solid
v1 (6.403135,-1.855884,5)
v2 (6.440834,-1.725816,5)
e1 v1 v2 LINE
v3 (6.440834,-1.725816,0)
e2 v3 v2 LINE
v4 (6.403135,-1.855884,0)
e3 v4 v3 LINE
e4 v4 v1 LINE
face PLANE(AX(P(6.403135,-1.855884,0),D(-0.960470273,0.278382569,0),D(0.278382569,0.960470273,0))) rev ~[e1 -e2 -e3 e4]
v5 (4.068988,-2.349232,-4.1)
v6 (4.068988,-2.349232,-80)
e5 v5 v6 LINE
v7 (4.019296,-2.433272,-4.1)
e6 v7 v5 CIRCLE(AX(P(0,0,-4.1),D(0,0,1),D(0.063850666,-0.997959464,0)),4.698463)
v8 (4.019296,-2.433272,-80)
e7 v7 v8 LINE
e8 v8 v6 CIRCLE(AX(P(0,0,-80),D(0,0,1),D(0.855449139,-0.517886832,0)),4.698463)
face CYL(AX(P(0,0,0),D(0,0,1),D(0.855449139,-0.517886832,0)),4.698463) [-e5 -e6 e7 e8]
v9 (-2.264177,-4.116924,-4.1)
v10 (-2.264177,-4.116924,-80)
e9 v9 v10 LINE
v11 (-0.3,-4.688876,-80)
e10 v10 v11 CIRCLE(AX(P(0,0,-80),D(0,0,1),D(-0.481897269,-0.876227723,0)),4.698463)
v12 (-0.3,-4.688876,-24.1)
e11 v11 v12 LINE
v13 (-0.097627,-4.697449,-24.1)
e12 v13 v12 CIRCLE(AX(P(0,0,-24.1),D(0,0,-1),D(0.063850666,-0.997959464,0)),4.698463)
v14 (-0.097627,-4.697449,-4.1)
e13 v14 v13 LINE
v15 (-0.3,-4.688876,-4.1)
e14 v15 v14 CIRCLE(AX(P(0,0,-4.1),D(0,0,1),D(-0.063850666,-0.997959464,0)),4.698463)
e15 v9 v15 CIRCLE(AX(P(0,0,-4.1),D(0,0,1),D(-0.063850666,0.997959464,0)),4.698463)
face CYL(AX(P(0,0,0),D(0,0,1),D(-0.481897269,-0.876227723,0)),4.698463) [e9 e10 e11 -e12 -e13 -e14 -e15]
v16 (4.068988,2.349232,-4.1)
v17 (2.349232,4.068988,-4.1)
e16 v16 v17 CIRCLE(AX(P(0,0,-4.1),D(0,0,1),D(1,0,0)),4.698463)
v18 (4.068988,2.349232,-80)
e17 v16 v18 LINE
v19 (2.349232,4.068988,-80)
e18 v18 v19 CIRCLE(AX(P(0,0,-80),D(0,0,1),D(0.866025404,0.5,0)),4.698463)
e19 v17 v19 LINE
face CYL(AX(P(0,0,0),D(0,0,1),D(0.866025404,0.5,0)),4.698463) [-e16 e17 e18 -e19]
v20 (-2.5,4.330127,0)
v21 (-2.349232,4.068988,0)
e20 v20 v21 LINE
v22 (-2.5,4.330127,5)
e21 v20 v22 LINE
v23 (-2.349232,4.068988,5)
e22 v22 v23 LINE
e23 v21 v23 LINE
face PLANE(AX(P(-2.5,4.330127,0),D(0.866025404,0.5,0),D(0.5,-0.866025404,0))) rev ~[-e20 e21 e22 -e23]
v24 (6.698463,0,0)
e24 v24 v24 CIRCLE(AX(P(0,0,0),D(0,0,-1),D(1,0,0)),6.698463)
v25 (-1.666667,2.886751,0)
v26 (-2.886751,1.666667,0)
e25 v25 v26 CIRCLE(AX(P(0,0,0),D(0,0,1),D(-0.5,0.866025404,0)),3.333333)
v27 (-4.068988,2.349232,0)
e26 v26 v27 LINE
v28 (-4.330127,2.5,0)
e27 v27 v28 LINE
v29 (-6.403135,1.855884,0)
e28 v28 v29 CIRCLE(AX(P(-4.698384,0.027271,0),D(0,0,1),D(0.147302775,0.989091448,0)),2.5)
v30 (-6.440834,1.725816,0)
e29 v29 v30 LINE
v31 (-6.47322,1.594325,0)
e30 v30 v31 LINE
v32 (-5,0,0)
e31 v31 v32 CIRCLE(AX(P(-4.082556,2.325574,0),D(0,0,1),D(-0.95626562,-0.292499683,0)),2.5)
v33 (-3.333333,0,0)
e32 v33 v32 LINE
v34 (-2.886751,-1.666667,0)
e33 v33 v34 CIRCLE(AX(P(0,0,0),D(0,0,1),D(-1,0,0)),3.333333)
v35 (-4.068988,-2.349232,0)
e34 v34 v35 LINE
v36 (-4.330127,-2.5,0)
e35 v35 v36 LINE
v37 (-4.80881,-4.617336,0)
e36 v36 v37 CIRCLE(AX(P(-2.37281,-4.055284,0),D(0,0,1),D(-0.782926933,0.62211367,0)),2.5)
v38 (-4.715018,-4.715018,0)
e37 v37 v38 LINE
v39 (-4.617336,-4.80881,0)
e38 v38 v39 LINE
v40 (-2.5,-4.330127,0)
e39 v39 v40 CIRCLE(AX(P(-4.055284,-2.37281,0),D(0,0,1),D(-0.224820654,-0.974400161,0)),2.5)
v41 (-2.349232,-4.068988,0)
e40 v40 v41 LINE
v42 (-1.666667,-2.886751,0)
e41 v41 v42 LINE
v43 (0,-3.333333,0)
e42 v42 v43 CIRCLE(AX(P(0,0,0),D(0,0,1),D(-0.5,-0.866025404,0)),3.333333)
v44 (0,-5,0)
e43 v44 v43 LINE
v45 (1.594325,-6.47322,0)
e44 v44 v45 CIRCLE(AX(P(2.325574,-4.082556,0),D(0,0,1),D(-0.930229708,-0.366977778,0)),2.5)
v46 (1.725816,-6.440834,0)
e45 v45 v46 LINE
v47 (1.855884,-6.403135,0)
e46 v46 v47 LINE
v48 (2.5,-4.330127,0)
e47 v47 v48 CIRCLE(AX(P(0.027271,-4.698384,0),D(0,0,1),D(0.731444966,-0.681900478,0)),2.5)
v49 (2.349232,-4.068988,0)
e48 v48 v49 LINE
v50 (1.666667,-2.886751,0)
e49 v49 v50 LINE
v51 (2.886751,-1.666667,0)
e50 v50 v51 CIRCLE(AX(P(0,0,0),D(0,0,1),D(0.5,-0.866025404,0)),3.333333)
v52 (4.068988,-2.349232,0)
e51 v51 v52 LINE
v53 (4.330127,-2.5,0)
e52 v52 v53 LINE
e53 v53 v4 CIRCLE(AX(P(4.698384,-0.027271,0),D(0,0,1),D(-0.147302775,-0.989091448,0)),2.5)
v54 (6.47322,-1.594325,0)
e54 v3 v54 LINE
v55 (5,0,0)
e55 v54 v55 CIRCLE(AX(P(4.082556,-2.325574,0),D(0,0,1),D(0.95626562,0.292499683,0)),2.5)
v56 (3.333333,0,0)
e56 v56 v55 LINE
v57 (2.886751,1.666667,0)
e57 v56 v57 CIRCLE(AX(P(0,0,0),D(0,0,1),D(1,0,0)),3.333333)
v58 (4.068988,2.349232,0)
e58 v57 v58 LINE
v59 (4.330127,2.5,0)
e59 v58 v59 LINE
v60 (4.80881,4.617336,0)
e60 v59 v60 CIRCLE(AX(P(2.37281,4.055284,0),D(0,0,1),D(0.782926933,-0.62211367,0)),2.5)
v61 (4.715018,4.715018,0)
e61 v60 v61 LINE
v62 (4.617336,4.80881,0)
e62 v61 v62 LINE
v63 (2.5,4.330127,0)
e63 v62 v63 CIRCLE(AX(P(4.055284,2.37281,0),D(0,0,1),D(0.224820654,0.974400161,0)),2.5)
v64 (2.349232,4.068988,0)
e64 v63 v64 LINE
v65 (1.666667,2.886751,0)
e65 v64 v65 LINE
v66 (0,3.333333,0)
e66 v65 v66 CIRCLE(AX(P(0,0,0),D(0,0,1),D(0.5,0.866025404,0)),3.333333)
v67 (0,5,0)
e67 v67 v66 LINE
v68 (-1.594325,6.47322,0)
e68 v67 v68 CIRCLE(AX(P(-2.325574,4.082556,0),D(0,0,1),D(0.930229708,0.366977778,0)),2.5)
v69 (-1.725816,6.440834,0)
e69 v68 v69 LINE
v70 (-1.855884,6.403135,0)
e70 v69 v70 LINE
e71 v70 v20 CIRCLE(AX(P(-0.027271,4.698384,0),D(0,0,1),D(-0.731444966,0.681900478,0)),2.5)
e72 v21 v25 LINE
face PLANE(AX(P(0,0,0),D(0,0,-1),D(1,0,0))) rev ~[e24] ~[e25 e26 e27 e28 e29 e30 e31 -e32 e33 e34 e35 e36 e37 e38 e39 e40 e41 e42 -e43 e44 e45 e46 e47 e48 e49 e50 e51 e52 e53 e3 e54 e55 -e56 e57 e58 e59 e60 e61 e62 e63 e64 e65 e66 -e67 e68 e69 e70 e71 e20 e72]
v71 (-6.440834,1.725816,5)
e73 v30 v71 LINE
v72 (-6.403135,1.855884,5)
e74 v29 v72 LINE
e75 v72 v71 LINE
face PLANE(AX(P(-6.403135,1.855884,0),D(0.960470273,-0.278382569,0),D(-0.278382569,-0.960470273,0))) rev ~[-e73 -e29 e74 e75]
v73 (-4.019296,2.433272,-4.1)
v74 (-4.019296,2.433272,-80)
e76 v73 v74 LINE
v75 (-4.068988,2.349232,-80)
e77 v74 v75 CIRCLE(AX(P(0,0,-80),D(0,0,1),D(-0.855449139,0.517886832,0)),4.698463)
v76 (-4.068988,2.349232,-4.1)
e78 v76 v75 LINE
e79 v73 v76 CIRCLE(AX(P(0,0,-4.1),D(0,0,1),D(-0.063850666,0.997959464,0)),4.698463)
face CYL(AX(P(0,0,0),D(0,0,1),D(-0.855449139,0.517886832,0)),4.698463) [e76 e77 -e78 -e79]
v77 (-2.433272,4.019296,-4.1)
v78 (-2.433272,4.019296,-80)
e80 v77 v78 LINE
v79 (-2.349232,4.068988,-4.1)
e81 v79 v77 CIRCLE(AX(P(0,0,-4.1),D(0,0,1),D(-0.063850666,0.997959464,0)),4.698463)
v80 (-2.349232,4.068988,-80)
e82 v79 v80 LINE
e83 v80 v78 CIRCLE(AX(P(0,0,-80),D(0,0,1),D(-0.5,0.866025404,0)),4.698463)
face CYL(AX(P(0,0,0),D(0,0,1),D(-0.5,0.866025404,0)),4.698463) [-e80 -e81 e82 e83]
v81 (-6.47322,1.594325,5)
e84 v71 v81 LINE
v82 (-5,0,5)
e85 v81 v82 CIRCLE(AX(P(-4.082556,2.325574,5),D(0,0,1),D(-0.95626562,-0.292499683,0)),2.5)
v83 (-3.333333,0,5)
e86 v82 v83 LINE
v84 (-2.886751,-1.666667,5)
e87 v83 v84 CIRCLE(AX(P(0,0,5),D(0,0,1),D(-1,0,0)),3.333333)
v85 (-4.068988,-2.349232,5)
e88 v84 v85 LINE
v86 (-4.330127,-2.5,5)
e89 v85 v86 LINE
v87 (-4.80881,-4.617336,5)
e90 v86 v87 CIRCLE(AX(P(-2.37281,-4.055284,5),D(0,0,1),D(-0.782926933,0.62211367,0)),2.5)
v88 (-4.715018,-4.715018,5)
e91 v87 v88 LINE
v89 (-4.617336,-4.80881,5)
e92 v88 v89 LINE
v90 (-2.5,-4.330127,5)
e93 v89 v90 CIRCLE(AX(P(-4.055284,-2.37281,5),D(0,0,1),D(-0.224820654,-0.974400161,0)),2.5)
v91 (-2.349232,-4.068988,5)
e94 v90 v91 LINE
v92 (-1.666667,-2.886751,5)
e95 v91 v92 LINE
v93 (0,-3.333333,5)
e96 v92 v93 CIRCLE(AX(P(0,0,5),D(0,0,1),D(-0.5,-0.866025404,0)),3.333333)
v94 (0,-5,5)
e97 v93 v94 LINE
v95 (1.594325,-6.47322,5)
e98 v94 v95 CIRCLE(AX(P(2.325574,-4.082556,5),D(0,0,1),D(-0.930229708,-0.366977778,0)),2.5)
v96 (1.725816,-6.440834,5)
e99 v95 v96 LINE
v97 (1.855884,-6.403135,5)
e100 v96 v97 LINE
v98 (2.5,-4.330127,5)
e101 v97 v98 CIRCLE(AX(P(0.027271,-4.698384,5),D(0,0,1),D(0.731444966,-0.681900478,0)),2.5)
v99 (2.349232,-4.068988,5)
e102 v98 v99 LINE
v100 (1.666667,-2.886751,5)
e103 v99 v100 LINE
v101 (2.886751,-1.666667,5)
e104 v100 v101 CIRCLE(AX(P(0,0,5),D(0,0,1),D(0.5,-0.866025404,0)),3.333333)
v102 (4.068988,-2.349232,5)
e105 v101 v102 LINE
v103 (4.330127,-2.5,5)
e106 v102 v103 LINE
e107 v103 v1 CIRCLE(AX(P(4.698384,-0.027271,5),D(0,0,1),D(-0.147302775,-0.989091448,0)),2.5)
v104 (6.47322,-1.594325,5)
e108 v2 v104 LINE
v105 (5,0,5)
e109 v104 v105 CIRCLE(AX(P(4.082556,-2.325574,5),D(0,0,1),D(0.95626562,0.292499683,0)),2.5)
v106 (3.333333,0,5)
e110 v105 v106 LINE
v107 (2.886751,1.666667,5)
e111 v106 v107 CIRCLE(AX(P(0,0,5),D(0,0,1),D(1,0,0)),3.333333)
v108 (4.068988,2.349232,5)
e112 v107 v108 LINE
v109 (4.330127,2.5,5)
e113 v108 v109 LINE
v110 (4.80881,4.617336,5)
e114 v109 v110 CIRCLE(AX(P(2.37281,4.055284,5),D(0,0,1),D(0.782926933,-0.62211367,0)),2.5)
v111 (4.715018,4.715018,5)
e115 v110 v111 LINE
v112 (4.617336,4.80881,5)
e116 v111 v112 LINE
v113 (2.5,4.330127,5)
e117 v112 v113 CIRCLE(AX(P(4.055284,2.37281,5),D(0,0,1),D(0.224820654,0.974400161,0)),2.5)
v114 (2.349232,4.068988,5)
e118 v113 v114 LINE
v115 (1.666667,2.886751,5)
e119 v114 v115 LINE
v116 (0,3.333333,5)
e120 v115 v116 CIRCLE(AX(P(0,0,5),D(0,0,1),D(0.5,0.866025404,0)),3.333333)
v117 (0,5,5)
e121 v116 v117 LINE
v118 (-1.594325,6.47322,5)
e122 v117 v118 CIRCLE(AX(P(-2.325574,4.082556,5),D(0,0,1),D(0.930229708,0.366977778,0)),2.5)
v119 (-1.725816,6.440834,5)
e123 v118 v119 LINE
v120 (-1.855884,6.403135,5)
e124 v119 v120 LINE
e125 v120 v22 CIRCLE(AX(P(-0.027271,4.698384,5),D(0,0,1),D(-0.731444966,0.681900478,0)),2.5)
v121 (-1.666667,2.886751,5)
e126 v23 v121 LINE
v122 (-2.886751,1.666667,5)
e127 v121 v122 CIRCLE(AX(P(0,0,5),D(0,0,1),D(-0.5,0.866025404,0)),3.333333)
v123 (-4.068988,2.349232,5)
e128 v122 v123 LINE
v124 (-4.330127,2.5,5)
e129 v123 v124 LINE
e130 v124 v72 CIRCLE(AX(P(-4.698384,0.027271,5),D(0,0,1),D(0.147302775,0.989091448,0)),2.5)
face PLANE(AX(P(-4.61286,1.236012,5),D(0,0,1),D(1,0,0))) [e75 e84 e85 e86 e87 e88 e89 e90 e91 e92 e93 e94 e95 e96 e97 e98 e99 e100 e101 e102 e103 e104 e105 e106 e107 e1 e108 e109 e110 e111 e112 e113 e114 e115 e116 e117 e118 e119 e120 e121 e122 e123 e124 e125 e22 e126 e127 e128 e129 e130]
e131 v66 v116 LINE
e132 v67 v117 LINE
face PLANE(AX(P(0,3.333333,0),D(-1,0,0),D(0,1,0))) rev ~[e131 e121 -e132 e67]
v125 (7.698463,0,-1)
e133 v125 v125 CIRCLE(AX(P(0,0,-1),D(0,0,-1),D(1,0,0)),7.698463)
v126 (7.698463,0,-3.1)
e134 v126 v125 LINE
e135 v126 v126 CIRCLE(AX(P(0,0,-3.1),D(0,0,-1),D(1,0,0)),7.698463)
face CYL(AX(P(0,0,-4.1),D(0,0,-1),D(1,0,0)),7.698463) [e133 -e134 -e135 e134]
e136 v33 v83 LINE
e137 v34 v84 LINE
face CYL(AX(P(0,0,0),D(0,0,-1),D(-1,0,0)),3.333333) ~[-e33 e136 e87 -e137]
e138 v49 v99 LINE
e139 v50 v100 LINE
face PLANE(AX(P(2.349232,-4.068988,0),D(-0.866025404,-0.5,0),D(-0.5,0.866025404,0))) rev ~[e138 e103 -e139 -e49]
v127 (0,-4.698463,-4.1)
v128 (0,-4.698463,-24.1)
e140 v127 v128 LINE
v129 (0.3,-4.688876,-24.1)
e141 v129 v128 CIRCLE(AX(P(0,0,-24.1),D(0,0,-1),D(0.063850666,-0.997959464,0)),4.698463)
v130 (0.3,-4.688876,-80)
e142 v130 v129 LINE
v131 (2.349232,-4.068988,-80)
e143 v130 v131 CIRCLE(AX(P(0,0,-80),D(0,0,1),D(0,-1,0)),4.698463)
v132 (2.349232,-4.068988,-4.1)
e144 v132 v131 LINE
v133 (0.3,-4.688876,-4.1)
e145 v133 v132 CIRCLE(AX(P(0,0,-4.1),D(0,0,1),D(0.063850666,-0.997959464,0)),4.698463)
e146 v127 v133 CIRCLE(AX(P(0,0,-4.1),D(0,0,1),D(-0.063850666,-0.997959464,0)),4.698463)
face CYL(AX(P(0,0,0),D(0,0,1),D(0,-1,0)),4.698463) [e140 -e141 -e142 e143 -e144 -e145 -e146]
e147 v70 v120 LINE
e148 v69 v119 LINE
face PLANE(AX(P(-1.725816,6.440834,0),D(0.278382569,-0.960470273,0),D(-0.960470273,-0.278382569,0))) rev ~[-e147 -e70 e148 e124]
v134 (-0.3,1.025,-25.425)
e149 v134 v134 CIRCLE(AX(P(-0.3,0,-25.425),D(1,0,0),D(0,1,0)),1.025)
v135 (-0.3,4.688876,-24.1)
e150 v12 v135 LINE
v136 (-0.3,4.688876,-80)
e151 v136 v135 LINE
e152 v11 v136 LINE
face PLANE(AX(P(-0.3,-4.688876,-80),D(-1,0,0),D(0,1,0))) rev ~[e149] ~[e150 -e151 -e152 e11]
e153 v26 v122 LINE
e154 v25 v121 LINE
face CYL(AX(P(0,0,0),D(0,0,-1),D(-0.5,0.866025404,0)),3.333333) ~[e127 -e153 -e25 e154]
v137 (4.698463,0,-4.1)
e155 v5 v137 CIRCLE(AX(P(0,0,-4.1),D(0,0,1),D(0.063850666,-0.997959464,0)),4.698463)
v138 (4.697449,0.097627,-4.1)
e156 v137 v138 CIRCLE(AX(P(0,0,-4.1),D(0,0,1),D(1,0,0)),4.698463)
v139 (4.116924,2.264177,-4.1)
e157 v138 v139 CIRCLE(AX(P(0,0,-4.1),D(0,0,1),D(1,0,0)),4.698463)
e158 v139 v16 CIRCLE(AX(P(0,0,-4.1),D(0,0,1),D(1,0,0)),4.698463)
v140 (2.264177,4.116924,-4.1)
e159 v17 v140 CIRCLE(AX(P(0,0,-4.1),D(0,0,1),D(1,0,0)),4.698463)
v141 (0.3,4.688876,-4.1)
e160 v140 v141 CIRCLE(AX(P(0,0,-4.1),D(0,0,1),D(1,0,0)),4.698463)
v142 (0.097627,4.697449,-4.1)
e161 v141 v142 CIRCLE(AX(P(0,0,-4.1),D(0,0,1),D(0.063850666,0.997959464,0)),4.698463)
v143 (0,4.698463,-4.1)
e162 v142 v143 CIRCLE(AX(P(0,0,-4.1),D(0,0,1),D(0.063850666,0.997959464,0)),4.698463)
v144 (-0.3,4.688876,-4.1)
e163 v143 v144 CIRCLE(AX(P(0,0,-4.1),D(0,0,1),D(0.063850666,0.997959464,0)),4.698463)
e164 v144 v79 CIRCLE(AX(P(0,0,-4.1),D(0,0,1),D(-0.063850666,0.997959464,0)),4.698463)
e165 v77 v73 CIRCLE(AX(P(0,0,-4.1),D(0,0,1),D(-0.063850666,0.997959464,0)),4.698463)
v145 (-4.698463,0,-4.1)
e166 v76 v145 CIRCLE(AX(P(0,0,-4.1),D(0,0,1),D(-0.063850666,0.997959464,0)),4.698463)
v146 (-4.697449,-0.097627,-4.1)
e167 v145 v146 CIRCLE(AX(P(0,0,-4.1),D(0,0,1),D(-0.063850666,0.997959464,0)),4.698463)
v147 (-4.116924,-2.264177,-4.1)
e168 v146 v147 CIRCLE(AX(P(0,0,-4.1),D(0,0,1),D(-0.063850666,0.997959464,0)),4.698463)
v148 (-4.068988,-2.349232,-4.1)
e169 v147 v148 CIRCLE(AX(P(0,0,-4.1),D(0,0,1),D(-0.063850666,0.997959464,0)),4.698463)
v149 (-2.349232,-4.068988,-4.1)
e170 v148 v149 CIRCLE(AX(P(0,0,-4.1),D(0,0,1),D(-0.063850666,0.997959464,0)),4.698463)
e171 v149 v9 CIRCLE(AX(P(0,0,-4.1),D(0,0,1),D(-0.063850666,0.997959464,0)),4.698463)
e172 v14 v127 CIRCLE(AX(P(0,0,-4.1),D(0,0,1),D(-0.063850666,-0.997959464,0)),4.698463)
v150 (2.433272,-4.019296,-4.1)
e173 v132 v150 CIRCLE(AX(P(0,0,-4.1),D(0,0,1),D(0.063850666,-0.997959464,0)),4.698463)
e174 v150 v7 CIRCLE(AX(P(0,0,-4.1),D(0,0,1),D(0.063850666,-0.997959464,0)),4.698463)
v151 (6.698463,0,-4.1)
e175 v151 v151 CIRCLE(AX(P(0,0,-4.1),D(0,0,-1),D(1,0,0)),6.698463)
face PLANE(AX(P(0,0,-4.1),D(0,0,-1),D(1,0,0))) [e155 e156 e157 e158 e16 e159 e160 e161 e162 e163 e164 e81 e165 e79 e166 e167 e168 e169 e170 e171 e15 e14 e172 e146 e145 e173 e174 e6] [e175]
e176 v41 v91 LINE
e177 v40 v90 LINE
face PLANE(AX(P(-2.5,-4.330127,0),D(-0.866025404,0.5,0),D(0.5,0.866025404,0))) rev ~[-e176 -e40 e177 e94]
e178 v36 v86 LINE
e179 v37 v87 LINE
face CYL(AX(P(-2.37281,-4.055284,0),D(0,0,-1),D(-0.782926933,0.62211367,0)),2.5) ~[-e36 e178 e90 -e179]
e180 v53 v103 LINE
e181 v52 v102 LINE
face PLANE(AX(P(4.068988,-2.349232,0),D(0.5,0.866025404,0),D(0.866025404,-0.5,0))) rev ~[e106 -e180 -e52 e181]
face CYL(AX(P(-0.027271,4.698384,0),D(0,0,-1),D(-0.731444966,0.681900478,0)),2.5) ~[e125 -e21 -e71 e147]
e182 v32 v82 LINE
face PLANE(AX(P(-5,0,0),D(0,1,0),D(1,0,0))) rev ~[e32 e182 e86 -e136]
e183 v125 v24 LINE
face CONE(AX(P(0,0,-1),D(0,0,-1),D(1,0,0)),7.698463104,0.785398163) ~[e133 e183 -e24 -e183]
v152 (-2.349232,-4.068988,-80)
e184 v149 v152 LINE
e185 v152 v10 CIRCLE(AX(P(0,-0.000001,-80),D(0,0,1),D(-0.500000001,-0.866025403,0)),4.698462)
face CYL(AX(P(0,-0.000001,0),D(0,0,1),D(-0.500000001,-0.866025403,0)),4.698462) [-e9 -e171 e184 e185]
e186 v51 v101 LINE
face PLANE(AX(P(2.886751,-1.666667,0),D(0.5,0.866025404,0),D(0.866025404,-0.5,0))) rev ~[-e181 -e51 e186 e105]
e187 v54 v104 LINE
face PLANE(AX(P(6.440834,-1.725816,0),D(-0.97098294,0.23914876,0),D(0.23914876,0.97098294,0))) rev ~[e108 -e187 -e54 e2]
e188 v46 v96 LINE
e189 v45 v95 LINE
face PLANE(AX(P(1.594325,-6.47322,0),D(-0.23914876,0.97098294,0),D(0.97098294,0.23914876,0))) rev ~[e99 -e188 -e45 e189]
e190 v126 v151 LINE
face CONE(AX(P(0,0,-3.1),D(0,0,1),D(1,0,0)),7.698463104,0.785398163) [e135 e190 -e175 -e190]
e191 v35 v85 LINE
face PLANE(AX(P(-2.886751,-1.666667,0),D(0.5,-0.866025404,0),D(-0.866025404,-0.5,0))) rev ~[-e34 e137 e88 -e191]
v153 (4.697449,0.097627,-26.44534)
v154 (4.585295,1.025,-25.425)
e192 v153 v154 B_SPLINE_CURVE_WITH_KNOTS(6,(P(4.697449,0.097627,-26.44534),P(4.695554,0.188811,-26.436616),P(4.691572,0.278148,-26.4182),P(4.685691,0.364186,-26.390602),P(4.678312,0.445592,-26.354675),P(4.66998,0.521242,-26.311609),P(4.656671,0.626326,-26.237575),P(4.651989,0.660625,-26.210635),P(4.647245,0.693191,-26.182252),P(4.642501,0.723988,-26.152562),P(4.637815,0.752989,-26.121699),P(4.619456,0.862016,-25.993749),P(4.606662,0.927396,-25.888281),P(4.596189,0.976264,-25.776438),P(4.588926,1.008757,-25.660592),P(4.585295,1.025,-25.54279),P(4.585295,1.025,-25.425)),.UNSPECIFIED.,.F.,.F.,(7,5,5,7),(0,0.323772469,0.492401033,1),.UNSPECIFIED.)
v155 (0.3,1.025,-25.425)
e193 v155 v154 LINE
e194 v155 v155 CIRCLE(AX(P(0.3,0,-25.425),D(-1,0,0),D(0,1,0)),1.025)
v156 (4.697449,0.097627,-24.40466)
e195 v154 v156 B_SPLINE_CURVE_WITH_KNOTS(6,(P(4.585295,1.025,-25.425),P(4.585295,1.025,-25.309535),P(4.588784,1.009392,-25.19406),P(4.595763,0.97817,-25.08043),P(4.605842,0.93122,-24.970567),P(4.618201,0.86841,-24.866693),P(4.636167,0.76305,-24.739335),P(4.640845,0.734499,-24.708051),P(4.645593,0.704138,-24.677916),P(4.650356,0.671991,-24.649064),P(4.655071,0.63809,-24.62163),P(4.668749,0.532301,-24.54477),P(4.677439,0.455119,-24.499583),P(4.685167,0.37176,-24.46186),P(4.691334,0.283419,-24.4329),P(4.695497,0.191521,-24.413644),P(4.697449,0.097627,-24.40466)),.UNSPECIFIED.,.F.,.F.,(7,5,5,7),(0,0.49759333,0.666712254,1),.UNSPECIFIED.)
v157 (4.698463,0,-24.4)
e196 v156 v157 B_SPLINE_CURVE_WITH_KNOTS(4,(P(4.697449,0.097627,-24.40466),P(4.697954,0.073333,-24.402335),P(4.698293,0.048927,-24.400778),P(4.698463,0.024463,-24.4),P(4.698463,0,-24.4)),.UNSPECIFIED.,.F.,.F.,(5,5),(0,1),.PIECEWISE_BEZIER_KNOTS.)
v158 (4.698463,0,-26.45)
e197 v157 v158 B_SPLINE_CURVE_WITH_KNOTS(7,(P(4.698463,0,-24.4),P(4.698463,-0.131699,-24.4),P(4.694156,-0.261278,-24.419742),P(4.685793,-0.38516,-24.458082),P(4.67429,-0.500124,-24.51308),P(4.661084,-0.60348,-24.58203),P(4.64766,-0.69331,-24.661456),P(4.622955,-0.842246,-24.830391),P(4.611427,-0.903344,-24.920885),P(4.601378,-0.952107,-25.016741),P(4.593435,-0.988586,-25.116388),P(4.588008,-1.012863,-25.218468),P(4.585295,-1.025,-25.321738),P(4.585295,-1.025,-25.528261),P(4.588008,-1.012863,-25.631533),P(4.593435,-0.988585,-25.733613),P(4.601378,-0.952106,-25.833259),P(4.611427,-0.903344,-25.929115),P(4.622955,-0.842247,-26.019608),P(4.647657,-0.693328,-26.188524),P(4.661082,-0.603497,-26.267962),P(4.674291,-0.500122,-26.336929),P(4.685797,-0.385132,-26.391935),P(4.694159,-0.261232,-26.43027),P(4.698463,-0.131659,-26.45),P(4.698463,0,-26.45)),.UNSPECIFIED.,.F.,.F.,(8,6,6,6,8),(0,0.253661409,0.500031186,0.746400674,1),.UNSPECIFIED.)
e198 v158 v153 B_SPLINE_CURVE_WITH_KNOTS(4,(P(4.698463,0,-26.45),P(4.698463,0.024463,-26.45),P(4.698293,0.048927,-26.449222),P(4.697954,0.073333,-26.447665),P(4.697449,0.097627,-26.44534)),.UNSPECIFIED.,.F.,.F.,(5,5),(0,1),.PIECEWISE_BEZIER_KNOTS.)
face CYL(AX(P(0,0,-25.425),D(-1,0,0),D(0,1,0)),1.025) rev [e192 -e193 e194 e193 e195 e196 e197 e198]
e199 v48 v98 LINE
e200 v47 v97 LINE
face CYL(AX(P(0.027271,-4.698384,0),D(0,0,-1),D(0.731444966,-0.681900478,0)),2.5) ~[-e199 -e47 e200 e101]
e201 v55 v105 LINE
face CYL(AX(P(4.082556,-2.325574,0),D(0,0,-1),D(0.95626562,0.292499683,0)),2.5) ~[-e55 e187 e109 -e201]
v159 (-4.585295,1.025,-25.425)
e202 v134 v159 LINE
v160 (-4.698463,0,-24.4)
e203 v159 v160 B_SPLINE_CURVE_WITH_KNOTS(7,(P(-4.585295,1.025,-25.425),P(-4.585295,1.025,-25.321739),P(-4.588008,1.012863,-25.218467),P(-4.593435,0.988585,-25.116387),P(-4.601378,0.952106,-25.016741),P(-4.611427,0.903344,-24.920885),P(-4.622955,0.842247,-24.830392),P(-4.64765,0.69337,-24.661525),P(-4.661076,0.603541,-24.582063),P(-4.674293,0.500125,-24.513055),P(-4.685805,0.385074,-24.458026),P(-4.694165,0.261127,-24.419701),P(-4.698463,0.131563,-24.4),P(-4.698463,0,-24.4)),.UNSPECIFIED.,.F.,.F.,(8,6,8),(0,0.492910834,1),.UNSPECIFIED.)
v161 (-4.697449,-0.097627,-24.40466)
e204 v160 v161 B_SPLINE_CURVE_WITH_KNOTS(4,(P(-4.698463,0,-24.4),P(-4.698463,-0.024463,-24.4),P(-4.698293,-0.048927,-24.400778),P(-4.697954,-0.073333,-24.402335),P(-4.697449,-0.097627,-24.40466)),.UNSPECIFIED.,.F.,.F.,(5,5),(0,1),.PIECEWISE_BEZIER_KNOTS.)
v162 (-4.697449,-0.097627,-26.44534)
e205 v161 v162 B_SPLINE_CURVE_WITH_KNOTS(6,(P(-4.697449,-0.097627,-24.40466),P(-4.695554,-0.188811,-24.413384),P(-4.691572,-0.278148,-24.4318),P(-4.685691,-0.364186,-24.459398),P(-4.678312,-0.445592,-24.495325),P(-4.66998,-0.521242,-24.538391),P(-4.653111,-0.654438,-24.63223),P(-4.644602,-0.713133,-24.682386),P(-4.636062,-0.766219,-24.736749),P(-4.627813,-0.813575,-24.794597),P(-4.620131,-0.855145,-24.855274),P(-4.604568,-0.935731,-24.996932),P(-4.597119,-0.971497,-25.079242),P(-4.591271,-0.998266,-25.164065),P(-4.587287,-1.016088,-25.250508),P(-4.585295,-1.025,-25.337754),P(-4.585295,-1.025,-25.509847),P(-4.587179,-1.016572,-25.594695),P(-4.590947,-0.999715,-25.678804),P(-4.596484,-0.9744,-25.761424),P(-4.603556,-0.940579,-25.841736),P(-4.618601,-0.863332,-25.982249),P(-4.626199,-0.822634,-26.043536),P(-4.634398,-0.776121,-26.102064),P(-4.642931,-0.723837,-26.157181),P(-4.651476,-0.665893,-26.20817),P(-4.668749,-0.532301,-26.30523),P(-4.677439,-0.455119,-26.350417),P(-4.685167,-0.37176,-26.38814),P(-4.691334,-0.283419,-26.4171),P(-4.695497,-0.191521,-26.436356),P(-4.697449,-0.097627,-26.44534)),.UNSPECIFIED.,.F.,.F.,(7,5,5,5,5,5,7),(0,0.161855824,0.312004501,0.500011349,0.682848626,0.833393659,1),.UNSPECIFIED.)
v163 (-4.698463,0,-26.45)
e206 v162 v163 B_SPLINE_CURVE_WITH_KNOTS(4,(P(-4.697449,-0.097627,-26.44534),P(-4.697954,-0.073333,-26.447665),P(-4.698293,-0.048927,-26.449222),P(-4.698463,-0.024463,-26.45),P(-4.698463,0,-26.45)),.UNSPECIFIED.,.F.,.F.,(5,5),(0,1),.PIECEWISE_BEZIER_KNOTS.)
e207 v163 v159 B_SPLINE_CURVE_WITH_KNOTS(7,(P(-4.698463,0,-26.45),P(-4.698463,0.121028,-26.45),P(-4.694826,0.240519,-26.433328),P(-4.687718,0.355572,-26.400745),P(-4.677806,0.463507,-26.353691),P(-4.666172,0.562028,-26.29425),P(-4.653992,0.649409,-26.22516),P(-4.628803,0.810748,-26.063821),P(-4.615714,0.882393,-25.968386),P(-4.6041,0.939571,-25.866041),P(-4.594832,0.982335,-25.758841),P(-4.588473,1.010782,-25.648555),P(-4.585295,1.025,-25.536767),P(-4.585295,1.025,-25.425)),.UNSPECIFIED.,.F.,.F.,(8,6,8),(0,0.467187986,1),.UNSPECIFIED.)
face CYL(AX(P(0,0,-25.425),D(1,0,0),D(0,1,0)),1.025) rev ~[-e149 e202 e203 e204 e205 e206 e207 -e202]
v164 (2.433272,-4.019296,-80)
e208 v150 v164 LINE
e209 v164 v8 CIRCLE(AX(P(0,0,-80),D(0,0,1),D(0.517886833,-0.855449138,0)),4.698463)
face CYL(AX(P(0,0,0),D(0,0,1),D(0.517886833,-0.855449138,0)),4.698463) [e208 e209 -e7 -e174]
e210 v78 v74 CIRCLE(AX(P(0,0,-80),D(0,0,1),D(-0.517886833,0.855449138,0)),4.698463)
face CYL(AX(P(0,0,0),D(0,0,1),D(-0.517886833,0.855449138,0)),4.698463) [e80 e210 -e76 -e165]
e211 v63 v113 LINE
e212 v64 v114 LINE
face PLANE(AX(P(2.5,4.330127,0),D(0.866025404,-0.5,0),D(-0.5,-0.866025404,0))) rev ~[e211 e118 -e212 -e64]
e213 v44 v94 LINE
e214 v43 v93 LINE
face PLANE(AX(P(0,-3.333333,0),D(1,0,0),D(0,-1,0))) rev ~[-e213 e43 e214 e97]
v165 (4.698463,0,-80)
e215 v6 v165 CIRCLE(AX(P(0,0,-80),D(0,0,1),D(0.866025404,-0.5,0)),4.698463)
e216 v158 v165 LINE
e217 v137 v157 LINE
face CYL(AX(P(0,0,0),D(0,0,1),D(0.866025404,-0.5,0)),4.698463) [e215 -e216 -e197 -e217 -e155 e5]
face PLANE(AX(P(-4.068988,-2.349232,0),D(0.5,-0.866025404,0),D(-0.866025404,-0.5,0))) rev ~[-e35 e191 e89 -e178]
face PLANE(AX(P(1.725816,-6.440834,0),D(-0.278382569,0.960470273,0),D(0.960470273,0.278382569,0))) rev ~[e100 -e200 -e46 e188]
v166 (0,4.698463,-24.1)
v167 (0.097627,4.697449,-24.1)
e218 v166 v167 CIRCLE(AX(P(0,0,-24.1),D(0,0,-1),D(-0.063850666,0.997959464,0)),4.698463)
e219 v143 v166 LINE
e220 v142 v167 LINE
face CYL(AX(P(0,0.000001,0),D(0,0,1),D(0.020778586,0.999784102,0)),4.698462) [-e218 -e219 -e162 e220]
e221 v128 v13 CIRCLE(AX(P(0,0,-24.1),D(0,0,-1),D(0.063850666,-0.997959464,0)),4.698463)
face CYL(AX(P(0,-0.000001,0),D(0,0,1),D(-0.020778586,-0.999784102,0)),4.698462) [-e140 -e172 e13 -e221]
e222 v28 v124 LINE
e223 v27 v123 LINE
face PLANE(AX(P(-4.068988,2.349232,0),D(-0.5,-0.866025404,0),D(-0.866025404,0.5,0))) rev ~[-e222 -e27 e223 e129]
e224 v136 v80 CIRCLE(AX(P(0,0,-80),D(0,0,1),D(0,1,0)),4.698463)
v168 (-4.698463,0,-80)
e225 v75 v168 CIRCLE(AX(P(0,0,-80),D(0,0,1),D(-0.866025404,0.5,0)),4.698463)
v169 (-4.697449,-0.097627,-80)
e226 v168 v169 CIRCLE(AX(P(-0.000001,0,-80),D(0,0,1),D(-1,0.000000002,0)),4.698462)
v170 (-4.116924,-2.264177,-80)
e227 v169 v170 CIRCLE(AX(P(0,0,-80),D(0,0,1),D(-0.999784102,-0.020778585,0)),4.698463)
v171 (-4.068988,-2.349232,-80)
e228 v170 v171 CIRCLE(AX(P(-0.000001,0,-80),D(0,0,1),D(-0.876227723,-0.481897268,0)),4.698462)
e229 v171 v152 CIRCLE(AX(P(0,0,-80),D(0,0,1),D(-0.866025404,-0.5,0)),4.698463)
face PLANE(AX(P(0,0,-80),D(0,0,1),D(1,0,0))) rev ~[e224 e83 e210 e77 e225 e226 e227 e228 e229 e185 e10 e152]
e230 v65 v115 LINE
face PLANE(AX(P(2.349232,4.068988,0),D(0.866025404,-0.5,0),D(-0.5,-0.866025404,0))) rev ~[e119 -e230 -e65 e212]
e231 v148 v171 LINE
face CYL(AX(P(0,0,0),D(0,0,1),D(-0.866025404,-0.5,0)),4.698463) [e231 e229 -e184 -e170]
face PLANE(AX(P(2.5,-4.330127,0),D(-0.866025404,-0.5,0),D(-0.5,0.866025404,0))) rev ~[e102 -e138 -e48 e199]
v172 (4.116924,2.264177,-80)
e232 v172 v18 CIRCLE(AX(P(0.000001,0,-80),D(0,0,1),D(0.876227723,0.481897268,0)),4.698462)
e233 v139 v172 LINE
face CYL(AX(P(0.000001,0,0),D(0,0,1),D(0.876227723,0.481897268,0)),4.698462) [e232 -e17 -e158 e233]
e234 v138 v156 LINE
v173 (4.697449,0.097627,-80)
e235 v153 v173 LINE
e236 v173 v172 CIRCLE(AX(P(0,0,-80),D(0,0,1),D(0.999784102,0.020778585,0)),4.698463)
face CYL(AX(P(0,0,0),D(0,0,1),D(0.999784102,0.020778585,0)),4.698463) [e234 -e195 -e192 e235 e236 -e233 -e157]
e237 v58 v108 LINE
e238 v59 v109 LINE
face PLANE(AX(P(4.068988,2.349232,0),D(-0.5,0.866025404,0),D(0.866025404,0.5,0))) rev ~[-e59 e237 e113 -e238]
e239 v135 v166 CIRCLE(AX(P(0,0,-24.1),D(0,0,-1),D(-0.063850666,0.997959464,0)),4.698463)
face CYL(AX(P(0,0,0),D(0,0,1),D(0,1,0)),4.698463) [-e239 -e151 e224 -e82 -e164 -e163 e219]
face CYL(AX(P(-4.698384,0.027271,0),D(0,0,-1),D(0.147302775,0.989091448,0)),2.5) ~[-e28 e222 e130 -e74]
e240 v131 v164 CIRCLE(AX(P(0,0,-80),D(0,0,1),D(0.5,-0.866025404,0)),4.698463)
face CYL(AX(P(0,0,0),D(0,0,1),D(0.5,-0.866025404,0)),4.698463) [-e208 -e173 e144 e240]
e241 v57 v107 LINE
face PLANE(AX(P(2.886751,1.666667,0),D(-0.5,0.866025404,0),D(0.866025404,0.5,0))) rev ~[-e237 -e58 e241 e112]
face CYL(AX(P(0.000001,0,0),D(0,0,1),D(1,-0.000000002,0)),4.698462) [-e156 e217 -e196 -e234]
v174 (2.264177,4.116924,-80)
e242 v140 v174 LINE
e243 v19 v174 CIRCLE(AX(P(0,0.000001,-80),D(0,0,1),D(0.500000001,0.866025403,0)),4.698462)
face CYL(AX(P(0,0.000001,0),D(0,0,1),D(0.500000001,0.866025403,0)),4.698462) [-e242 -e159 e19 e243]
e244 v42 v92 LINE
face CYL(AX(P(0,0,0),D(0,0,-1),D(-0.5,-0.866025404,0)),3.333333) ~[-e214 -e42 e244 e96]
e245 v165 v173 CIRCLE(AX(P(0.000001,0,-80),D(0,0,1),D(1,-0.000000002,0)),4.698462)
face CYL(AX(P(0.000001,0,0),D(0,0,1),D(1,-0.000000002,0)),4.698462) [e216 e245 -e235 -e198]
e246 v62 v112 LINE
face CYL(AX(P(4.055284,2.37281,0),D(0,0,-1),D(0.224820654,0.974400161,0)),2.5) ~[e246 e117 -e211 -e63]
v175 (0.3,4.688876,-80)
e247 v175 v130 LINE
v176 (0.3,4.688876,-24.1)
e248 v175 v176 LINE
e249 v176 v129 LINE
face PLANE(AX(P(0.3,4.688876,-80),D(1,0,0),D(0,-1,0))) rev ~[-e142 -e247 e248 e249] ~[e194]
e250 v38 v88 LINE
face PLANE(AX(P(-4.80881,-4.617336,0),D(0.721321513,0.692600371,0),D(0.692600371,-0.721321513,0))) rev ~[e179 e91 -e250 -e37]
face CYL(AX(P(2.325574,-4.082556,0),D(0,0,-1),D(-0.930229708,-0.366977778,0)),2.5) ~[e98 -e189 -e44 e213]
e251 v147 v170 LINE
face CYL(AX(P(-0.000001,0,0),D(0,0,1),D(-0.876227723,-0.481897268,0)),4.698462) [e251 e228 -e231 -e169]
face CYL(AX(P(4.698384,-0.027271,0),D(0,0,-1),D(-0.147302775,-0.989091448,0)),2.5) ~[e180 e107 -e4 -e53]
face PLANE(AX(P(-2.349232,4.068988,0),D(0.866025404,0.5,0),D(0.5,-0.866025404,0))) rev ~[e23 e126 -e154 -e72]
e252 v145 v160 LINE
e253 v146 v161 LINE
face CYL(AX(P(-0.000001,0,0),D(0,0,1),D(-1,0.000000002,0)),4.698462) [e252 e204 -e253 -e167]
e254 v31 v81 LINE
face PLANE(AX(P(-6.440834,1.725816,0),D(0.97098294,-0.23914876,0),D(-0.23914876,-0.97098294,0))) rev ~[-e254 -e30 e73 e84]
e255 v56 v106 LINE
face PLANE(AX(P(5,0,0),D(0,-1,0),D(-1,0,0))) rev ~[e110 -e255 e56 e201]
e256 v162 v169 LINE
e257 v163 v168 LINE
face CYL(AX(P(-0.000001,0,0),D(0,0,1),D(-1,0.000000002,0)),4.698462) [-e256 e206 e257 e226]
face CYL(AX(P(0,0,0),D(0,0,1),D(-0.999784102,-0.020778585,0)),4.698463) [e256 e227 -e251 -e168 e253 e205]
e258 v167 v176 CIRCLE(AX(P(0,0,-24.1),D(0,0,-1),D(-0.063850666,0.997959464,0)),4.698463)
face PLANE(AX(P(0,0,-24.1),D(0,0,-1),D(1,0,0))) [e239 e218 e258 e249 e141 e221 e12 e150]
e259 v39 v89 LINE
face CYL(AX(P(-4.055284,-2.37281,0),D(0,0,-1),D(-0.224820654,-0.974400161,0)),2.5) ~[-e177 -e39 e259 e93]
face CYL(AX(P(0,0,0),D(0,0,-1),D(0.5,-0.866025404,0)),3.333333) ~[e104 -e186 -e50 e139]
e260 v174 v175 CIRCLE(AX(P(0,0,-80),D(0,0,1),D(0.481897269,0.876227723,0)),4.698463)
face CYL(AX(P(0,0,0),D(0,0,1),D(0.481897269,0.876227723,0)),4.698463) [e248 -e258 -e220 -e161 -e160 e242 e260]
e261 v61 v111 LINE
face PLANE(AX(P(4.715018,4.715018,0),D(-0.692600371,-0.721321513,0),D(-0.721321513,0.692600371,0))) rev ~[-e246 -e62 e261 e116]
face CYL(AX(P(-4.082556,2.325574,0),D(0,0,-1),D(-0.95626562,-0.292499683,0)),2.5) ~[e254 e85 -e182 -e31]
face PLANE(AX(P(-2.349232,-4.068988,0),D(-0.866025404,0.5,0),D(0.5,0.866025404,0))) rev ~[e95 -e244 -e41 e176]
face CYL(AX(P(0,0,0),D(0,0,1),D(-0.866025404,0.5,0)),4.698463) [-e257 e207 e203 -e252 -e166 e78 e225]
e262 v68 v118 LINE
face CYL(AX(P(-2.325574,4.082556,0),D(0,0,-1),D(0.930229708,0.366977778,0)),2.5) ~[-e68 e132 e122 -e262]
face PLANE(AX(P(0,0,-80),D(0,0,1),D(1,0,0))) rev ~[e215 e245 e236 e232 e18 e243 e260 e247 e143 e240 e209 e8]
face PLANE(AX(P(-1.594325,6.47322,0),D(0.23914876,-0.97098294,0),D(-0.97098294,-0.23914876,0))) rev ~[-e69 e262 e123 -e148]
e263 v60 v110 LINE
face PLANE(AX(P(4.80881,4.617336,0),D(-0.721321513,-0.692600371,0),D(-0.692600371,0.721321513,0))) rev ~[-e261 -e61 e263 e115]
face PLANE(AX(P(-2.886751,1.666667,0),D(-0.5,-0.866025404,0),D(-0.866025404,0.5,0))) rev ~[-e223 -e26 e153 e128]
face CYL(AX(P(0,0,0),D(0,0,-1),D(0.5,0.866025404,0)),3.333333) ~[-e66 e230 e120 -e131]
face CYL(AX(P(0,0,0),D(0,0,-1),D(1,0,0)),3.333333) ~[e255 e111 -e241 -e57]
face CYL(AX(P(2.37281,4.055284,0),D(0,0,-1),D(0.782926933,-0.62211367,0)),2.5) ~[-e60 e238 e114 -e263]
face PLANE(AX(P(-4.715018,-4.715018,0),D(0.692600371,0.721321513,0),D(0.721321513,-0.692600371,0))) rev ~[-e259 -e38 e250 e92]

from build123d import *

# Parameters (mm, degrees)
F6_DEPTH       = 5
F7_DEPTH       = 80
F9_START       = -75.9
F8_R           = 7.6984631039
F9_DEPTH       = 4.1
F10_SIZE       = 1
F11_DEPTH      = 55.9
F12_R          = 1.025
F13_DEPTH      = 7.6994631039
F13_DEPTH_BACK = 7.6994631039


# Not quite as in the source:
# - a feature names something its author has since deleted; it is built from what else it names


with BuildPart() as f6:
    # F5 (on Top) → F6 (new body)
    with BuildSketch(Plane.XY):
        with BuildLine():
            Line((-4.0689884067, 2.349231552), (-4.3301270189, 2.5))
            ThreePointArc((-4.3301270189, 2.5), (-4.8296291314, 1.2940952255), (-5, 0))
            Line((-5, 0), (-4.6984631039, 0))
            ThreePointArc((-4.6984631039, 0), (-4.538366856, 1.216051734), (-4.0689884067, 2.349231552))
        make_face()
        with BuildLine():
            Line((-2.8867513459, 1.6666666667), (-4.0689884067, 2.349231552))
            ThreePointArc((-4.0689884067, 2.349231552), (-4.538366856, 1.216051734), (-4.6984631039, 0))
            Line((-4.6984631039, 0), (-3.3333333333, 0))
            ThreePointArc((-3.3333333333, 0), (-3.2197527543, 0.8627301503), (-2.8867513459, 1.6666666667))
        make_face()
        with BuildLine():
            ThreePointArc((-2.5, 4.3301270189), (-1.2940952255, 4.8296291314), (0, 5))
            ThreePointArc((0, 5), (-0.6289197853, 5.9186828799), (-1.5943250641, 6.4732196035))
            Line((-1.5943250641, 6.4732196035), (-1.7258162456, 6.440833913))
            Line((-1.7258162456, 6.440833913), (-1.8558837944, 6.4031351529))
            ThreePointArc((-1.8558837944, 6.4031351529), (-2.414680929, 5.4401896236), (-2.5, 4.3301270189))
        make_face()
        with BuildLine():
            ThreePointArc((2.8867513459, -1.6666666667), (3.2197527543, -0.8627301503), (3.3333333333, 0))
            ThreePointArc((3.3333333333, 0), (3.2197527543, 0.8627301503), (2.8867513459, 1.6666666667))
            ThreePointArc((2.8867513459, 1.6666666667), (2.357022604, 2.357022604), (1.6666666667, 2.8867513459))
            ThreePointArc((1.6666666667, 2.8867513459), (0.8627301503, 3.2197527543), (0, 3.3333333333))
            ThreePointArc((0, 3.3333333333), (-0.8627301503, 3.2197527543), (-1.6666666667, 2.8867513459))
            ThreePointArc((-1.6666666667, 2.8867513459), (-2.357022604, 2.357022604), (-2.8867513459, 1.6666666667))
            ThreePointArc((-2.8867513459, 1.6666666667), (-3.2197527543, 0.8627301503), (-3.3333333333, 0))
            ThreePointArc((-3.3333333333, 0), (-3.2197527543, -0.8627301503), (-2.8867513459, -1.6666666667))
            ThreePointArc((-2.8867513459, -1.6666666667), (-2.357022604, -2.357022604), (-1.6666666667, -2.8867513459))
            ThreePointArc((-1.6666666667, -2.8867513459), (-0.8627301503, -3.2197527543), (0, -3.3333333333))
            ThreePointArc((0, -3.3333333333), (0.8627301503, -3.2197527543), (1.6666666667, -2.8867513459))
            ThreePointArc((1.6666666667, -2.8867513459), (2.357022604, -2.357022604), (2.8867513459, -1.6666666667))
        make_face()
        with BuildLine():
            Line((4.0689884067, 2.349231552), (4.3301270189, 2.5))
            ThreePointArc((4.3301270189, 2.5), (3.5355339059, 3.5355339059), (2.5, 4.3301270189))
            Line((2.5, 4.3301270189), (2.349231552, 4.0689884067))
            ThreePointArc((2.349231552, 4.0689884067), (3.3223151219, 3.3223151219), (4.0689884067, 2.349231552))
        make_face()
        with BuildLine():
            Line((2.8867513459, 1.6666666667), (4.0689884067, 2.349231552))
            ThreePointArc((4.0689884067, 2.349231552), (3.3223151219, 3.3223151219), (2.349231552, 4.0689884067))
            Line((2.349231552, 4.0689884067), (1.6666666667, 2.8867513459))
            ThreePointArc((1.6666666667, 2.8867513459), (2.357022604, 2.357022604), (2.8867513459, 1.6666666667))
        make_face()
        with BuildLine():
            ThreePointArc((4.3301270189, -2.5), (4.8296291314, -1.2940952255), (5, 0))
            Line((5, 0), (4.6984631039, 0))
            ThreePointArc((4.6984631039, 0), (4.538366856, -1.216051734), (4.0689884067, -2.349231552))
            Line((4.0689884067, -2.349231552), (4.3301270189, -2.5))
        make_face()
        with BuildLine():
            ThreePointArc((4.0689884067, -2.349231552), (4.538366856, -1.216051734), (4.6984631039, 0))
            Line((4.6984631039, 0), (3.3333333333, 0))
            ThreePointArc((3.3333333333, 0), (3.2197527543, -0.8627301503), (2.8867513459, -1.6666666667))
            Line((2.8867513459, -1.6666666667), (4.0689884067, -2.349231552))
        make_face()
        with BuildLine():
            ThreePointArc((0, -5), (1.2940952255, -4.8296291314), (2.5, -4.3301270189))
            Line((2.5, -4.3301270189), (2.349231552, -4.0689884067))
            ThreePointArc((2.349231552, -4.0689884067), (1.216051734, -4.538366856), (0, -4.6984631039))
            Line((0, -4.6984631039), (0, -5))
        make_face()
        with BuildLine():
            ThreePointArc((0, -4.6984631039), (1.216051734, -4.538366856), (2.349231552, -4.0689884067))
            Line((2.349231552, -4.0689884067), (1.6666666667, -2.8867513459))
            ThreePointArc((1.6666666667, -2.8867513459), (0.8627301503, -3.2197527543), (0, -3.3333333333))
            Line((0, -3.3333333333), (0, -4.6984631039))
        make_face()
        with BuildLine():
            ThreePointArc((-4.3301270189, -2.5), (-3.5355339059, -3.5355339059), (-2.5, -4.3301270189))
            Line((-2.5, -4.3301270189), (-2.349231552, -4.0689884067))
            ThreePointArc((-2.349231552, -4.0689884067), (-3.3223151219, -3.3223151219), (-4.0689884067, -2.349231552))
            Line((-4.0689884067, -2.349231552), (-4.3301270189, -2.5))
        make_face()
        with BuildLine():
            ThreePointArc((-4.0689884067, -2.349231552), (-3.3223151219, -3.3223151219), (-2.349231552, -4.0689884067))
            Line((-2.349231552, -4.0689884067), (-1.6666666667, -2.8867513459))
            ThreePointArc((-1.6666666667, -2.8867513459), (-2.357022604, -2.357022604), (-2.8867513459, -1.6666666667))
            Line((-2.8867513459, -1.6666666667), (-4.0689884067, -2.349231552))
        make_face()
        with BuildLine():
            Line((0, 4.6984631039), (0, 5))
            ThreePointArc((0, 5), (-1.2940952255, 4.8296291314), (-2.5, 4.3301270189))
            Line((-2.5, 4.3301270189), (-2.349231552, 4.0689884067))
            ThreePointArc((-2.349231552, 4.0689884067), (-1.216051734, 4.538366856), (0, 4.6984631039))
        make_face()
        with BuildLine():
            Line((0, 3.3333333333), (0, 4.6984631039))
            ThreePointArc((0, 4.6984631039), (-1.216051734, 4.538366856), (-2.349231552, 4.0689884067))
            Line((-2.349231552, 4.0689884067), (-1.6666666667, 2.8867513459))
            ThreePointArc((-1.6666666667, 2.8867513459), (-0.8627301503, 3.2197527543), (0, 3.3333333333))
        make_face()
        with BuildLine():
            ThreePointArc((-5, 0), (-4.8296291314, 1.2940952255), (-4.3301270189, 2.5))
            ThreePointArc((-4.3301270189, 2.5), (-5.4401896236, 2.414680929), (-6.4031351529, 1.8558837944))
            Line((-6.4031351529, 1.8558837944), (-6.440833913, 1.7258162456))
            Line((-6.440833913, 1.7258162456), (-6.4732196035, 1.5943250641))
            ThreePointArc((-6.4732196035, 1.5943250641), (-5.9186828799, 0.6289197853), (-5, 0))
        make_face()
        with BuildLine():
            ThreePointArc((-4.6173358091, -4.8088100888), (-3.5040019509, -4.8112698383), (-2.5, -4.3301270189))
            ThreePointArc((-2.5, -4.3301270189), (-3.5355339059, -3.5355339059), (-4.3301270189, -2.5))
            ThreePointArc((-4.3301270189, -2.5), (-4.8112698383, -3.5040019509), (-4.8088100888, -4.6173358091))
            Line((-4.8088100888, -4.6173358091), (-4.7150176674, -4.7150176674))
            Line((-4.7150176674, -4.7150176674), (-4.6173358091, -4.8088100888))
        make_face()
        with BuildLine():
            ThreePointArc((1.8558837944, -6.4031351529), (2.414680929, -5.4401896236), (2.5, -4.3301270189))
            ThreePointArc((2.5, -4.3301270189), (1.2940952255, -4.8296291314), (0, -5))
            ThreePointArc((0, -5), (0.6289197853, -5.9186828799), (1.5943250641, -6.4732196035))
            Line((1.5943250641, -6.4732196035), (1.7258162456, -6.440833913))
            Line((1.7258162456, -6.440833913), (1.8558837944, -6.4031351529))
        make_face()
        with BuildLine():
            ThreePointArc((6.4732196035, -1.5943250641), (5.9186828799, -0.6289197853), (5, 0))
            ThreePointArc((5, 0), (4.8296291314, -1.2940952255), (4.3301270189, -2.5))
            ThreePointArc((4.3301270189, -2.5), (5.4401896236, -2.414680929), (6.4031351529, -1.8558837944))
            Line((6.4031351529, -1.8558837944), (6.440833913, -1.7258162456))
            Line((6.440833913, -1.7258162456), (6.4732196035, -1.5943250641))
        make_face()
        with BuildLine():
            ThreePointArc((2.5, 4.3301270189), (3.5355339059, 3.5355339059), (4.3301270189, 2.5))
            ThreePointArc((4.3301270189, 2.5), (4.8112698383, 3.5040019509), (4.8088100888, 4.6173358091))
            Line((4.8088100888, 4.6173358091), (4.7150176674, 4.7150176674))
            Line((4.7150176674, 4.7150176674), (4.6173358091, 4.8088100888))
            ThreePointArc((4.6173358091, 4.8088100888), (3.5040019509, 4.8112698383), (2.5, 4.3301270189))
        make_face()
    extrude(amount=F6_DEPTH)

    # F5 (on Top) → F7 (join)
    with BuildSketch(Plane.XY):
        with BuildLine():
            ThreePointArc((2.8867513459, -1.6666666667), (3.2197527543, -0.8627301503), (3.3333333333, 0))
            ThreePointArc((3.3333333333, 0), (3.2197527543, 0.8627301503), (2.8867513459, 1.6666666667))
            ThreePointArc((2.8867513459, 1.6666666667), (2.357022604, 2.357022604), (1.6666666667, 2.8867513459))
            ThreePointArc((1.6666666667, 2.8867513459), (0.8627301503, 3.2197527543), (0, 3.3333333333))
            ThreePointArc((0, 3.3333333333), (-0.8627301503, 3.2197527543), (-1.6666666667, 2.8867513459))
            ThreePointArc((-1.6666666667, 2.8867513459), (-2.357022604, 2.357022604), (-2.8867513459, 1.6666666667))
            ThreePointArc((-2.8867513459, 1.6666666667), (-3.2197527543, 0.8627301503), (-3.3333333333, 0))
            ThreePointArc((-3.3333333333, 0), (-3.2197527543, -0.8627301503), (-2.8867513459, -1.6666666667))
            ThreePointArc((-2.8867513459, -1.6666666667), (-2.357022604, -2.357022604), (-1.6666666667, -2.8867513459))
            ThreePointArc((-1.6666666667, -2.8867513459), (-0.8627301503, -3.2197527543), (0, -3.3333333333))
            ThreePointArc((0, -3.3333333333), (0.8627301503, -3.2197527543), (1.6666666667, -2.8867513459))
            ThreePointArc((1.6666666667, -2.8867513459), (2.357022604, -2.357022604), (2.8867513459, -1.6666666667))
        make_face()
        with BuildLine():
            ThreePointArc((-4.1169236265, -2.2641765374), (-4.0931769499, -2.306828558), (-4.0689884067, -2.349231552))
            Line((-4.0689884067, -2.349231552), (-2.8867513459, -1.6666666667))
            ThreePointArc((-2.8867513459, -1.6666666667), (-3.2197527543, -0.8627301503), (-3.3333333333, 0))
            Line((-3.3333333333, 0), (-4.6984631039, 0))
            ThreePointArc((-4.6984631039, 0), (-4.6982094998, -0.0488163415), (-4.6974487147, -0.0976274132))
            ThreePointArc((-4.6974487147, -0.0976274132), (-4.538366856, -1.216051734), (-4.1169236265, -2.2641765374))
        make_face()
        with BuildLine():
            Line((-2.8867513459, 1.6666666667), (-4.0689884067, 2.349231552))
            ThreePointArc((-4.0689884067, 2.349231552), (-4.538366856, 1.216051734), (-4.6984631039, 0))
            Line((-4.6984631039, 0), (-3.3333333333, 0))
            ThreePointArc((-3.3333333333, 0), (-3.2197527543, 0.8627301503), (-2.8867513459, 1.6666666667))
        make_face()
        with BuildLine():
            ThreePointArc((-2.349231552, 4.0689884067), (-2.3913809418, 4.0443606083), (-2.4332721773, 4.0192962133))
            ThreePointArc((-2.4332721773, 4.0192962133), (-3.3223151219, 3.3223151219), (-4.0192962133, 2.4332721773))
            ThreePointArc((-4.0192962133, 2.4332721773), (-4.0443606083, 2.3913809418), (-4.0689884067, 2.349231552))
            Line((-4.0689884067, 2.349231552), (-2.8867513459, 1.6666666667))
            ThreePointArc((-2.8867513459, 1.6666666667), (-2.357022604, 2.357022604), (-1.6666666667, 2.8867513459))
            Line((-1.6666666667, 2.8867513459), (-2.349231552, 4.0689884067))
        make_face()
        with BuildLine():
            Line((0, 3.3333333333), (0, 4.6984631039))
            ThreePointArc((0, 4.6984631039), (-1.216051734, 4.538366856), (-2.349231552, 4.0689884067))
            Line((-2.349231552, 4.0689884067), (-1.6666666667, 2.8867513459))
            ThreePointArc((-1.6666666667, 2.8867513459), (-0.8627301503, 3.2197527543), (0, 3.3333333333))
        make_face()
        with BuildLine():
            ThreePointArc((2.349231552, 4.0689884067), (2.306828558, 4.0931769499), (2.2641765374, 4.1169236265))
            ThreePointArc((2.2641765374, 4.1169236265), (1.216051734, 4.538366856), (0.0976274132, 4.6974487147))
            ThreePointArc((0.0976274132, 4.6974487147), (0.0488163415, 4.6982094998), (0, 4.6984631039))
            Line((0, 4.6984631039), (0, 3.3333333333))
            ThreePointArc((0, 3.3333333333), (0.8627301503, 3.2197527543), (1.6666666667, 2.8867513459))
            Line((1.6666666667, 2.8867513459), (2.349231552, 4.0689884067))
        make_face()
        with BuildLine():
            Line((2.8867513459, 1.6666666667), (4.0689884067, 2.349231552))
            ThreePointArc((4.0689884067, 2.349231552), (3.3223151219, 3.3223151219), (2.349231552, 4.0689884067))
            Line((2.349231552, 4.0689884067), (1.6666666667, 2.8867513459))
            ThreePointArc((1.6666666667, 2.8867513459), (2.357022604, 2.357022604), (2.8867513459, 1.6666666667))
        make_face()
        with BuildLine():
            ThreePointArc((4.6984631039, 0), (4.6982094998, 0.0488163415), (4.6974487147, 0.0976274132))
            ThreePointArc((4.6974487147, 0.0976274132), (4.538366856, 1.216051734), (4.1169236265, 2.2641765374))
            ThreePointArc((4.1169236265, 2.2641765374), (4.0931769499, 2.306828558), (4.0689884067, 2.349231552))
            Line((4.0689884067, 2.349231552), (2.8867513459, 1.6666666667))
            ThreePointArc((2.8867513459, 1.6666666667), (3.2197527543, 0.8627301503), (3.3333333333, 0))
            Line((3.3333333333, 0), (4.6984631039, 0))
        make_face()
        with BuildLine():
            ThreePointArc((4.0689884067, -2.349231552), (4.538366856, -1.216051734), (4.6984631039, 0))
            Line((4.6984631039, 0), (3.3333333333, 0))
            ThreePointArc((3.3333333333, 0), (3.2197527543, -0.8627301503), (2.8867513459, -1.6666666667))
            Line((2.8867513459, -1.6666666667), (4.0689884067, -2.349231552))
        make_face()
        with BuildLine():
            ThreePointArc((4.0192962133, -2.4332721773), (4.0443606083, -2.3913809418), (4.0689884067, -2.349231552))
            Line((4.0689884067, -2.349231552), (2.8867513459, -1.6666666667))
            ThreePointArc((2.8867513459, -1.6666666667), (2.357022604, -2.357022604), (1.6666666667, -2.8867513459))
            Line((1.6666666667, -2.8867513459), (2.349231552, -4.0689884067))
            ThreePointArc((2.349231552, -4.0689884067), (2.3913809418, -4.0443606083), (2.4332721773, -4.0192962133))
            ThreePointArc((2.4332721773, -4.0192962133), (3.3223151219, -3.3223151219), (4.0192962133, -2.4332721773))
        make_face()
        with BuildLine():
            ThreePointArc((0, -4.6984631039), (1.216051734, -4.538366856), (2.349231552, -4.0689884067))
            Line((2.349231552, -4.0689884067), (1.6666666667, -2.8867513459))
            ThreePointArc((1.6666666667, -2.8867513459), (0.8627301503, -3.2197527543), (0, -3.3333333333))
            Line((0, -3.3333333333), (0, -4.6984631039))
        make_face()
        with BuildLine():
            ThreePointArc((-0.0976274132, -4.6974487147), (-0.0488163415, -4.6982094998), (0, -4.6984631039))
            Line((0, -4.6984631039), (0, -3.3333333333))
            ThreePointArc((0, -3.3333333333), (-0.8627301503, -3.2197527543), (-1.6666666667, -2.8867513459))
            Line((-1.6666666667, -2.8867513459), (-2.349231552, -4.0689884067))
            ThreePointArc((-2.349231552, -4.0689884067), (-2.306828558, -4.0931769499), (-2.2641765374, -4.1169236265))
            ThreePointArc((-2.2641765374, -4.1169236265), (-1.216051734, -4.538366856), (-0.0976274132, -4.6974487147))
        make_face()
        with BuildLine():
            ThreePointArc((-4.0689884067, -2.349231552), (-3.3223151219, -3.3223151219), (-2.349231552, -4.0689884067))
            Line((-2.349231552, -4.0689884067), (-1.6666666667, -2.8867513459))
            ThreePointArc((-1.6666666667, -2.8867513459), (-2.357022604, -2.357022604), (-2.8867513459, -1.6666666667))
            Line((-2.8867513459, -1.6666666667), (-4.0689884067, -2.349231552))
        make_face()
    extrude(amount=-F7_DEPTH)

    # F8 (on face) → F9 (join)
    with BuildSketch(Plane(origin=(0, 0, -80), x_dir=(1, 0, 0), z_dir=(0, 0, -1)).offset(F9_START)):
        Circle(F8_R)
        with BuildLine():
            ThreePointArc((-0.3, -4.6888757223), (-4.6984631039, 0), (-0.3, 4.6888757223))
            ThreePointArc((-0.3, 4.6888757223), (0, 4.6984631039), (0.3, 4.6888757223))
            ThreePointArc((0.3, 4.6888757223), (3.4267400303, 3.2144996973), (4.6984631039, 0))
            ThreePointArc((4.6984631039, 0), (3.4267400303, -3.2144996973), (0.3, -4.6888757223))
            ThreePointArc((0.3, -4.6888757223), (0, -4.6984631039), (-0.3, -4.6888757223))
        make_face(mode=Mode.SUBTRACT)
    extrude(amount=-F9_DEPTH)

    # F10
    f10_edges = [f6.edges().sort_by_distance(p)[0] for p in [
        (-7.698463, 0, 0),
        (-7.698463, 0, -4.1),
    ]]
    chamfer(f10_edges, length=F10_SIZE)

    # F8 (on face) → F11 (cut)
    with BuildSketch(Plane(origin=(0, 0, -80), x_dir=(1, 0, 0), z_dir=(0, 0, -1))):
        with BuildLine():
            ThreePointArc((0.3, 4.6888757223), (0, 4.6984631039), (-0.3, 4.6888757223))
            Line((-0.3, 4.6888757223), (-0.3, -4.6888757223))
            ThreePointArc((-0.3, -4.6888757223), (0, -4.6984631039), (0.3, -4.6888757223))
            Line((0.3, -4.6888757223), (0.3, 4.6888757223))
        make_face()
    extrude(amount=-F11_DEPTH, mode=Mode.SUBTRACT)

    # F12 (on Right) → F13 (cut, two sides)
    with BuildSketch(Plane.YZ) as f13_sk:
        with Locations((0, -25.425)):
            Circle(F12_R)
    extrude(amount=F13_DEPTH, mode=Mode.SUBTRACT)
    extrude(f13_sk.sketch, amount=-F13_DEPTH_BACK, mode=Mode.SUBTRACT)


solid = f6.part
